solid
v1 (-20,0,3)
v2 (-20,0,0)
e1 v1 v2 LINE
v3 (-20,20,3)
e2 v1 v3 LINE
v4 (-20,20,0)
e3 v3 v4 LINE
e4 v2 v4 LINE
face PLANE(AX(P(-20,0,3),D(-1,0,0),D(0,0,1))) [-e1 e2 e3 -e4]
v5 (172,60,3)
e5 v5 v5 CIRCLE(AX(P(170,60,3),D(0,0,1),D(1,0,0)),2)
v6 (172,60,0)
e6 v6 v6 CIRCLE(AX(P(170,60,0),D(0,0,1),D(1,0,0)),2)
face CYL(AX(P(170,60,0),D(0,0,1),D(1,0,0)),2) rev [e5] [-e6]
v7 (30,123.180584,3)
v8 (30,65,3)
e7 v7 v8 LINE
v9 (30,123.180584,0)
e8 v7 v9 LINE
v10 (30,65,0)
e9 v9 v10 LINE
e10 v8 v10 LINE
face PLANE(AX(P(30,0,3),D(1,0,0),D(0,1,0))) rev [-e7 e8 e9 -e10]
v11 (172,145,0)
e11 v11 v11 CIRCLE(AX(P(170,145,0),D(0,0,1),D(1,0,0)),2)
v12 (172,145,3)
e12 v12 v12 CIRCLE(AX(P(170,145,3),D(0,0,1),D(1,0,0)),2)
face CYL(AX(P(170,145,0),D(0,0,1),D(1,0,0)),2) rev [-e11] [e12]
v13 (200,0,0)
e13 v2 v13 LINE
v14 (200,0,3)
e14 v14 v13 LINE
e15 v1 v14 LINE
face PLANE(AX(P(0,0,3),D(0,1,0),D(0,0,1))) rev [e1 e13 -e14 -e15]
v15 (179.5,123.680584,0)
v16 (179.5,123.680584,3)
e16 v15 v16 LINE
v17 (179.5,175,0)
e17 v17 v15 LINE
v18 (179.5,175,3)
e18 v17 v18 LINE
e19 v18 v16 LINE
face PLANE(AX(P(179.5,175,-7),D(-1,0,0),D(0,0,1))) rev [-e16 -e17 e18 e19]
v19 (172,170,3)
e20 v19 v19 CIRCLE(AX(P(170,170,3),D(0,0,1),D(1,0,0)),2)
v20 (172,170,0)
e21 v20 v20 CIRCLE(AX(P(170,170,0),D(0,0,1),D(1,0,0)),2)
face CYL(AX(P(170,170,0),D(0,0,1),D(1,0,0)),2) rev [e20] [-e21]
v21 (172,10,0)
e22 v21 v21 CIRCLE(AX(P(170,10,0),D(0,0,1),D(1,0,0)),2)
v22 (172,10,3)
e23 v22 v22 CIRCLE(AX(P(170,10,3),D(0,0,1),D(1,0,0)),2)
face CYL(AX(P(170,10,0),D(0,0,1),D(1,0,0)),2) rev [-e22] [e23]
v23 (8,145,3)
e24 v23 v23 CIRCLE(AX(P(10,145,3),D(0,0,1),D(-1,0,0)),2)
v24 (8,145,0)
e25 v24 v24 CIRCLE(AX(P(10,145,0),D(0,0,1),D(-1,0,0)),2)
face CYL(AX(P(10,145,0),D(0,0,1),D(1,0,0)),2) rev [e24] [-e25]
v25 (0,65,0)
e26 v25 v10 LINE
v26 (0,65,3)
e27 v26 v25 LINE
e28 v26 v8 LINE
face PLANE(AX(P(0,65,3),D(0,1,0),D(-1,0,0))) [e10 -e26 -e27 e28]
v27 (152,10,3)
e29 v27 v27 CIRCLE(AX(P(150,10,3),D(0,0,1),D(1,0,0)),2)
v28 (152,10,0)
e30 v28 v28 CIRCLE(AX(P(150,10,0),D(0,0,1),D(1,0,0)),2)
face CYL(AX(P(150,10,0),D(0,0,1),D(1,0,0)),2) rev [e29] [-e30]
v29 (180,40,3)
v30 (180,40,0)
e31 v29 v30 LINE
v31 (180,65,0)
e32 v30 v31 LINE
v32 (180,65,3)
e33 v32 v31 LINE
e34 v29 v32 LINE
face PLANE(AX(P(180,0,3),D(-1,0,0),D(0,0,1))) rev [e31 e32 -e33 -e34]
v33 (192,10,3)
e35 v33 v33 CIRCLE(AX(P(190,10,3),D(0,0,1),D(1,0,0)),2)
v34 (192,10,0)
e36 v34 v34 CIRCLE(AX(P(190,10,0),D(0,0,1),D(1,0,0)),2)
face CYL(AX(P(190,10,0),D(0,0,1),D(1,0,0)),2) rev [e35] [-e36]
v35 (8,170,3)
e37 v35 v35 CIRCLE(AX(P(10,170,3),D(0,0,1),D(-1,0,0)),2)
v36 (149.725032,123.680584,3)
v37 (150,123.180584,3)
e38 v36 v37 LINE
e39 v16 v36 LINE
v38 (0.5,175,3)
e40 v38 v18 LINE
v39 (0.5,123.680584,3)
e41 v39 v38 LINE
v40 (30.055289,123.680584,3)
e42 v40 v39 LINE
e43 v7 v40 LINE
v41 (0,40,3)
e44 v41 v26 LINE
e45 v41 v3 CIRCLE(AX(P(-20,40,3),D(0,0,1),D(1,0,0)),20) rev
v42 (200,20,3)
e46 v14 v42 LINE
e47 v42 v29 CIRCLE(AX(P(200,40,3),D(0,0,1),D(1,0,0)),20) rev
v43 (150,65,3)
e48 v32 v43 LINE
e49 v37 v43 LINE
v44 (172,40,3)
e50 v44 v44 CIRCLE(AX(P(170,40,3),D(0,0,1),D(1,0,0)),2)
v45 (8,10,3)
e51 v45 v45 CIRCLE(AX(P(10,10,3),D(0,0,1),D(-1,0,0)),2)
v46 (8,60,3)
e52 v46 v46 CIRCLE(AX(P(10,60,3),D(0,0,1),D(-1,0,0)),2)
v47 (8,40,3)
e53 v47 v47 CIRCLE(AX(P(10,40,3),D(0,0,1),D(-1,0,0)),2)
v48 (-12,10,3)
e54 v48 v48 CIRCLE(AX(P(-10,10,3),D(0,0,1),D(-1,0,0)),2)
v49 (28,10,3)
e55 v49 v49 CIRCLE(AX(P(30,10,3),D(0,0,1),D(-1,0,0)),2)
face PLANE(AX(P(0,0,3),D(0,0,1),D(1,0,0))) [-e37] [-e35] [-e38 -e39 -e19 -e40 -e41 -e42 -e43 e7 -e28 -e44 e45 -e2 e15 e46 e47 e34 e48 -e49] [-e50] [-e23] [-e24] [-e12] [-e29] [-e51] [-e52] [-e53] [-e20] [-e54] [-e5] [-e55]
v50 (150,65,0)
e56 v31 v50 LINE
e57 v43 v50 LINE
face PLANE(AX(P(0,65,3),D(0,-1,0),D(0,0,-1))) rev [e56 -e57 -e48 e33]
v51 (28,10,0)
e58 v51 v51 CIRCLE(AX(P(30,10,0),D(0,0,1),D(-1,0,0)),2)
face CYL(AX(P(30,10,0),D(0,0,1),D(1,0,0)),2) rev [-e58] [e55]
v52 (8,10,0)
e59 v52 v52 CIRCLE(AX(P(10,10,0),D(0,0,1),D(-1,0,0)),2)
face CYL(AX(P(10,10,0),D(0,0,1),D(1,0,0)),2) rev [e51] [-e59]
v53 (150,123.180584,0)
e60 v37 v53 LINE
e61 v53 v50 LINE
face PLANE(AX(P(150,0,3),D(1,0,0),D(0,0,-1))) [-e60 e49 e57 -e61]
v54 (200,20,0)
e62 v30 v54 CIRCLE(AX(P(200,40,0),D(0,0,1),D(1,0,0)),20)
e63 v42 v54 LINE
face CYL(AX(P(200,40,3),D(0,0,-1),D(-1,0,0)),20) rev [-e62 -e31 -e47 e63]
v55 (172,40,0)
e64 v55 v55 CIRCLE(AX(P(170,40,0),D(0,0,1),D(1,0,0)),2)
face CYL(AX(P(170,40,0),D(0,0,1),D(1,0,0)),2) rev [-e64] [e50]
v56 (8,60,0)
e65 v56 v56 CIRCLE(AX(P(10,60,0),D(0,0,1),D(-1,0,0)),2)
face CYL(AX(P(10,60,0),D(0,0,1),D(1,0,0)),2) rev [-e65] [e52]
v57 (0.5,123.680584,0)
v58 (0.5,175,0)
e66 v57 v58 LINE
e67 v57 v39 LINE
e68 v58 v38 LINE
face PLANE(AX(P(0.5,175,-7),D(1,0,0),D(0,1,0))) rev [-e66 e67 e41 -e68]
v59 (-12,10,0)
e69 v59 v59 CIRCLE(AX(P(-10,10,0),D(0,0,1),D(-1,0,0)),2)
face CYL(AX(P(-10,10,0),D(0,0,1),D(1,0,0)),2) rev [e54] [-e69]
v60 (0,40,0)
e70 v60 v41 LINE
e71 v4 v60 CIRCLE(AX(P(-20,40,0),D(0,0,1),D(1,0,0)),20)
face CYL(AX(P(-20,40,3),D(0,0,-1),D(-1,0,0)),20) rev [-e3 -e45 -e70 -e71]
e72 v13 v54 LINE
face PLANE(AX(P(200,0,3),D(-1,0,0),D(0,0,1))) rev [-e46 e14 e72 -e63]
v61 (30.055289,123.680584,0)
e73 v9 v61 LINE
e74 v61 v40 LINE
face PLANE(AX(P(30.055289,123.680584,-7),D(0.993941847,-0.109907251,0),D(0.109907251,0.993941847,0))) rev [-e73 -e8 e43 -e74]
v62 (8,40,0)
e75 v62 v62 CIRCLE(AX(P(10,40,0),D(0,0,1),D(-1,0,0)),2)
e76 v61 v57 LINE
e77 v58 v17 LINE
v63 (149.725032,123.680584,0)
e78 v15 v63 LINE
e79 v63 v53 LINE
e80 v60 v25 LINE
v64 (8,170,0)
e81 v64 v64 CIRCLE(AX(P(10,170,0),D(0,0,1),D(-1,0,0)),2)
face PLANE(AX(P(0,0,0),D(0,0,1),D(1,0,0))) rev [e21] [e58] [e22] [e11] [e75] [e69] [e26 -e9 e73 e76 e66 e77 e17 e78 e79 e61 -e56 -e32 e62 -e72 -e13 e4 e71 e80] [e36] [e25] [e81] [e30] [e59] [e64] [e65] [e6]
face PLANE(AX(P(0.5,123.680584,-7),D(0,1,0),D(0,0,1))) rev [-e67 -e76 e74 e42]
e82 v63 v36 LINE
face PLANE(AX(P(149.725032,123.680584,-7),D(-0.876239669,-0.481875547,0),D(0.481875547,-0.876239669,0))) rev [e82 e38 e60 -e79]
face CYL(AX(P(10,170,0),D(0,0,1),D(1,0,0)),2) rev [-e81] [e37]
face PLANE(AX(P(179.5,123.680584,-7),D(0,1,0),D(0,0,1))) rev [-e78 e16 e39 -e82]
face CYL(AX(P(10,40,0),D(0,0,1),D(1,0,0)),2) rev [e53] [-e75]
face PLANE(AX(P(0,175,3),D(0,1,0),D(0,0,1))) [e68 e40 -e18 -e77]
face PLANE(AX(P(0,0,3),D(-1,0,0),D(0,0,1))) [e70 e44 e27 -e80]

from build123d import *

# Parameters (mm, degrees)
EXTRUDE_1_DEPTH     = 3
FILLET_2_R          = 20
SKETCH_2_R          = 2
CUT_EXTRUDE_1_DEPTH = 3
CUT_EXTRUDE_2_DEPTH = 10


with BuildPart() as part:
    # 草图1 → 凸台-拉伸1 (new body)
    with BuildSketch(Plane.XY):
        Polygon((0, 65), (0, 20), (-20, 20), (-20, 0), (200, 0), (200, 20), (180, 20), (180, 65), (150, 65), (150, 123.180584191), (180, 123.180584191), (180, 175), (0, 175), (0, 123.180584191), (30, 123.180584191), (30, 65), align=None)
    extrude(amount=EXTRUDE_1_DEPTH)

    # 圆角2
    fillet_2_edges = [part.edges().sort_by_distance(p)[0] for p in [
        (0, 20, 1.5),
        (180, 20, 1.5),
    ]]
    fillet(fillet_2_edges, radius=FILLET_2_R - 0.0001)  # a hair under: the kernel refuses the full size

    # 草图2 → 切除-拉伸1 (cut)
    with BuildSketch(Plane.XY.offset(3)):
        with Locations((170, 10)):
            Circle(SKETCH_2_R)
        with Locations((190, 10)):
            Circle(SKETCH_2_R)
        with Locations((170, 40)):
            Circle(SKETCH_2_R)
        with Locations((150, 10)):
            Circle(SKETCH_2_R)
        with Locations(Location((30, 10, 0), (0, 0, 180))):
            Circle(SKETCH_2_R)
        with Locations(Location((10, 40, 0), (0, 0, 180))):
            Circle(SKETCH_2_R)
        with Locations(Location((-10, 10, 0), (0, 0, 180))):
            Circle(SKETCH_2_R)
        with Locations(Location((10, 10, 0), (0, 0, 180))):
            Circle(SKETCH_2_R)
        with Locations((170, 145)):
            Circle(SKETCH_2_R)
        with Locations(Location((10, 145, 0), (0, 0, 180))):
            Circle(SKETCH_2_R)
        with Locations((170, 60)):
            Circle(SKETCH_2_R)
        with Locations(Location((10, 60, 0), (0, 0, 180))):
            Circle(SKETCH_2_R)
        with Locations((170, 170)):
            Circle(SKETCH_2_R)
        with Locations(Location((10, 170, 0), (0, 0, 180))):
            Circle(SKETCH_2_R)
    extrude(amount=-CUT_EXTRUDE_1_DEPTH, mode=Mode.SUBTRACT)

    # 草图4 → 切除-拉伸2 (cut)
    with BuildSketch(Plane.XY.offset(3)):
        Polygon((0.5, 175), (0.5, 123.680584191), (30.055288572, 123.680584191), (30, 123.180584191), (-10.698425682, 117.187764406), (-9.272714691, 179.443811016), (-1.573875339, 179.443811016), align=None)
        Polygon((179.5, 175), (179.5, 123.680584191), (149.725032109, 123.680584191), (150, 123.180584191), (194.189444242, 109.302917778), (194.429656629, 189.306403842), (181.700722274, 189.306403842), align=None)
    extrude(amount=-CUT_EXTRUDE_2_DEPTH, mode=Mode.SUBTRACT)


solid = part.part
